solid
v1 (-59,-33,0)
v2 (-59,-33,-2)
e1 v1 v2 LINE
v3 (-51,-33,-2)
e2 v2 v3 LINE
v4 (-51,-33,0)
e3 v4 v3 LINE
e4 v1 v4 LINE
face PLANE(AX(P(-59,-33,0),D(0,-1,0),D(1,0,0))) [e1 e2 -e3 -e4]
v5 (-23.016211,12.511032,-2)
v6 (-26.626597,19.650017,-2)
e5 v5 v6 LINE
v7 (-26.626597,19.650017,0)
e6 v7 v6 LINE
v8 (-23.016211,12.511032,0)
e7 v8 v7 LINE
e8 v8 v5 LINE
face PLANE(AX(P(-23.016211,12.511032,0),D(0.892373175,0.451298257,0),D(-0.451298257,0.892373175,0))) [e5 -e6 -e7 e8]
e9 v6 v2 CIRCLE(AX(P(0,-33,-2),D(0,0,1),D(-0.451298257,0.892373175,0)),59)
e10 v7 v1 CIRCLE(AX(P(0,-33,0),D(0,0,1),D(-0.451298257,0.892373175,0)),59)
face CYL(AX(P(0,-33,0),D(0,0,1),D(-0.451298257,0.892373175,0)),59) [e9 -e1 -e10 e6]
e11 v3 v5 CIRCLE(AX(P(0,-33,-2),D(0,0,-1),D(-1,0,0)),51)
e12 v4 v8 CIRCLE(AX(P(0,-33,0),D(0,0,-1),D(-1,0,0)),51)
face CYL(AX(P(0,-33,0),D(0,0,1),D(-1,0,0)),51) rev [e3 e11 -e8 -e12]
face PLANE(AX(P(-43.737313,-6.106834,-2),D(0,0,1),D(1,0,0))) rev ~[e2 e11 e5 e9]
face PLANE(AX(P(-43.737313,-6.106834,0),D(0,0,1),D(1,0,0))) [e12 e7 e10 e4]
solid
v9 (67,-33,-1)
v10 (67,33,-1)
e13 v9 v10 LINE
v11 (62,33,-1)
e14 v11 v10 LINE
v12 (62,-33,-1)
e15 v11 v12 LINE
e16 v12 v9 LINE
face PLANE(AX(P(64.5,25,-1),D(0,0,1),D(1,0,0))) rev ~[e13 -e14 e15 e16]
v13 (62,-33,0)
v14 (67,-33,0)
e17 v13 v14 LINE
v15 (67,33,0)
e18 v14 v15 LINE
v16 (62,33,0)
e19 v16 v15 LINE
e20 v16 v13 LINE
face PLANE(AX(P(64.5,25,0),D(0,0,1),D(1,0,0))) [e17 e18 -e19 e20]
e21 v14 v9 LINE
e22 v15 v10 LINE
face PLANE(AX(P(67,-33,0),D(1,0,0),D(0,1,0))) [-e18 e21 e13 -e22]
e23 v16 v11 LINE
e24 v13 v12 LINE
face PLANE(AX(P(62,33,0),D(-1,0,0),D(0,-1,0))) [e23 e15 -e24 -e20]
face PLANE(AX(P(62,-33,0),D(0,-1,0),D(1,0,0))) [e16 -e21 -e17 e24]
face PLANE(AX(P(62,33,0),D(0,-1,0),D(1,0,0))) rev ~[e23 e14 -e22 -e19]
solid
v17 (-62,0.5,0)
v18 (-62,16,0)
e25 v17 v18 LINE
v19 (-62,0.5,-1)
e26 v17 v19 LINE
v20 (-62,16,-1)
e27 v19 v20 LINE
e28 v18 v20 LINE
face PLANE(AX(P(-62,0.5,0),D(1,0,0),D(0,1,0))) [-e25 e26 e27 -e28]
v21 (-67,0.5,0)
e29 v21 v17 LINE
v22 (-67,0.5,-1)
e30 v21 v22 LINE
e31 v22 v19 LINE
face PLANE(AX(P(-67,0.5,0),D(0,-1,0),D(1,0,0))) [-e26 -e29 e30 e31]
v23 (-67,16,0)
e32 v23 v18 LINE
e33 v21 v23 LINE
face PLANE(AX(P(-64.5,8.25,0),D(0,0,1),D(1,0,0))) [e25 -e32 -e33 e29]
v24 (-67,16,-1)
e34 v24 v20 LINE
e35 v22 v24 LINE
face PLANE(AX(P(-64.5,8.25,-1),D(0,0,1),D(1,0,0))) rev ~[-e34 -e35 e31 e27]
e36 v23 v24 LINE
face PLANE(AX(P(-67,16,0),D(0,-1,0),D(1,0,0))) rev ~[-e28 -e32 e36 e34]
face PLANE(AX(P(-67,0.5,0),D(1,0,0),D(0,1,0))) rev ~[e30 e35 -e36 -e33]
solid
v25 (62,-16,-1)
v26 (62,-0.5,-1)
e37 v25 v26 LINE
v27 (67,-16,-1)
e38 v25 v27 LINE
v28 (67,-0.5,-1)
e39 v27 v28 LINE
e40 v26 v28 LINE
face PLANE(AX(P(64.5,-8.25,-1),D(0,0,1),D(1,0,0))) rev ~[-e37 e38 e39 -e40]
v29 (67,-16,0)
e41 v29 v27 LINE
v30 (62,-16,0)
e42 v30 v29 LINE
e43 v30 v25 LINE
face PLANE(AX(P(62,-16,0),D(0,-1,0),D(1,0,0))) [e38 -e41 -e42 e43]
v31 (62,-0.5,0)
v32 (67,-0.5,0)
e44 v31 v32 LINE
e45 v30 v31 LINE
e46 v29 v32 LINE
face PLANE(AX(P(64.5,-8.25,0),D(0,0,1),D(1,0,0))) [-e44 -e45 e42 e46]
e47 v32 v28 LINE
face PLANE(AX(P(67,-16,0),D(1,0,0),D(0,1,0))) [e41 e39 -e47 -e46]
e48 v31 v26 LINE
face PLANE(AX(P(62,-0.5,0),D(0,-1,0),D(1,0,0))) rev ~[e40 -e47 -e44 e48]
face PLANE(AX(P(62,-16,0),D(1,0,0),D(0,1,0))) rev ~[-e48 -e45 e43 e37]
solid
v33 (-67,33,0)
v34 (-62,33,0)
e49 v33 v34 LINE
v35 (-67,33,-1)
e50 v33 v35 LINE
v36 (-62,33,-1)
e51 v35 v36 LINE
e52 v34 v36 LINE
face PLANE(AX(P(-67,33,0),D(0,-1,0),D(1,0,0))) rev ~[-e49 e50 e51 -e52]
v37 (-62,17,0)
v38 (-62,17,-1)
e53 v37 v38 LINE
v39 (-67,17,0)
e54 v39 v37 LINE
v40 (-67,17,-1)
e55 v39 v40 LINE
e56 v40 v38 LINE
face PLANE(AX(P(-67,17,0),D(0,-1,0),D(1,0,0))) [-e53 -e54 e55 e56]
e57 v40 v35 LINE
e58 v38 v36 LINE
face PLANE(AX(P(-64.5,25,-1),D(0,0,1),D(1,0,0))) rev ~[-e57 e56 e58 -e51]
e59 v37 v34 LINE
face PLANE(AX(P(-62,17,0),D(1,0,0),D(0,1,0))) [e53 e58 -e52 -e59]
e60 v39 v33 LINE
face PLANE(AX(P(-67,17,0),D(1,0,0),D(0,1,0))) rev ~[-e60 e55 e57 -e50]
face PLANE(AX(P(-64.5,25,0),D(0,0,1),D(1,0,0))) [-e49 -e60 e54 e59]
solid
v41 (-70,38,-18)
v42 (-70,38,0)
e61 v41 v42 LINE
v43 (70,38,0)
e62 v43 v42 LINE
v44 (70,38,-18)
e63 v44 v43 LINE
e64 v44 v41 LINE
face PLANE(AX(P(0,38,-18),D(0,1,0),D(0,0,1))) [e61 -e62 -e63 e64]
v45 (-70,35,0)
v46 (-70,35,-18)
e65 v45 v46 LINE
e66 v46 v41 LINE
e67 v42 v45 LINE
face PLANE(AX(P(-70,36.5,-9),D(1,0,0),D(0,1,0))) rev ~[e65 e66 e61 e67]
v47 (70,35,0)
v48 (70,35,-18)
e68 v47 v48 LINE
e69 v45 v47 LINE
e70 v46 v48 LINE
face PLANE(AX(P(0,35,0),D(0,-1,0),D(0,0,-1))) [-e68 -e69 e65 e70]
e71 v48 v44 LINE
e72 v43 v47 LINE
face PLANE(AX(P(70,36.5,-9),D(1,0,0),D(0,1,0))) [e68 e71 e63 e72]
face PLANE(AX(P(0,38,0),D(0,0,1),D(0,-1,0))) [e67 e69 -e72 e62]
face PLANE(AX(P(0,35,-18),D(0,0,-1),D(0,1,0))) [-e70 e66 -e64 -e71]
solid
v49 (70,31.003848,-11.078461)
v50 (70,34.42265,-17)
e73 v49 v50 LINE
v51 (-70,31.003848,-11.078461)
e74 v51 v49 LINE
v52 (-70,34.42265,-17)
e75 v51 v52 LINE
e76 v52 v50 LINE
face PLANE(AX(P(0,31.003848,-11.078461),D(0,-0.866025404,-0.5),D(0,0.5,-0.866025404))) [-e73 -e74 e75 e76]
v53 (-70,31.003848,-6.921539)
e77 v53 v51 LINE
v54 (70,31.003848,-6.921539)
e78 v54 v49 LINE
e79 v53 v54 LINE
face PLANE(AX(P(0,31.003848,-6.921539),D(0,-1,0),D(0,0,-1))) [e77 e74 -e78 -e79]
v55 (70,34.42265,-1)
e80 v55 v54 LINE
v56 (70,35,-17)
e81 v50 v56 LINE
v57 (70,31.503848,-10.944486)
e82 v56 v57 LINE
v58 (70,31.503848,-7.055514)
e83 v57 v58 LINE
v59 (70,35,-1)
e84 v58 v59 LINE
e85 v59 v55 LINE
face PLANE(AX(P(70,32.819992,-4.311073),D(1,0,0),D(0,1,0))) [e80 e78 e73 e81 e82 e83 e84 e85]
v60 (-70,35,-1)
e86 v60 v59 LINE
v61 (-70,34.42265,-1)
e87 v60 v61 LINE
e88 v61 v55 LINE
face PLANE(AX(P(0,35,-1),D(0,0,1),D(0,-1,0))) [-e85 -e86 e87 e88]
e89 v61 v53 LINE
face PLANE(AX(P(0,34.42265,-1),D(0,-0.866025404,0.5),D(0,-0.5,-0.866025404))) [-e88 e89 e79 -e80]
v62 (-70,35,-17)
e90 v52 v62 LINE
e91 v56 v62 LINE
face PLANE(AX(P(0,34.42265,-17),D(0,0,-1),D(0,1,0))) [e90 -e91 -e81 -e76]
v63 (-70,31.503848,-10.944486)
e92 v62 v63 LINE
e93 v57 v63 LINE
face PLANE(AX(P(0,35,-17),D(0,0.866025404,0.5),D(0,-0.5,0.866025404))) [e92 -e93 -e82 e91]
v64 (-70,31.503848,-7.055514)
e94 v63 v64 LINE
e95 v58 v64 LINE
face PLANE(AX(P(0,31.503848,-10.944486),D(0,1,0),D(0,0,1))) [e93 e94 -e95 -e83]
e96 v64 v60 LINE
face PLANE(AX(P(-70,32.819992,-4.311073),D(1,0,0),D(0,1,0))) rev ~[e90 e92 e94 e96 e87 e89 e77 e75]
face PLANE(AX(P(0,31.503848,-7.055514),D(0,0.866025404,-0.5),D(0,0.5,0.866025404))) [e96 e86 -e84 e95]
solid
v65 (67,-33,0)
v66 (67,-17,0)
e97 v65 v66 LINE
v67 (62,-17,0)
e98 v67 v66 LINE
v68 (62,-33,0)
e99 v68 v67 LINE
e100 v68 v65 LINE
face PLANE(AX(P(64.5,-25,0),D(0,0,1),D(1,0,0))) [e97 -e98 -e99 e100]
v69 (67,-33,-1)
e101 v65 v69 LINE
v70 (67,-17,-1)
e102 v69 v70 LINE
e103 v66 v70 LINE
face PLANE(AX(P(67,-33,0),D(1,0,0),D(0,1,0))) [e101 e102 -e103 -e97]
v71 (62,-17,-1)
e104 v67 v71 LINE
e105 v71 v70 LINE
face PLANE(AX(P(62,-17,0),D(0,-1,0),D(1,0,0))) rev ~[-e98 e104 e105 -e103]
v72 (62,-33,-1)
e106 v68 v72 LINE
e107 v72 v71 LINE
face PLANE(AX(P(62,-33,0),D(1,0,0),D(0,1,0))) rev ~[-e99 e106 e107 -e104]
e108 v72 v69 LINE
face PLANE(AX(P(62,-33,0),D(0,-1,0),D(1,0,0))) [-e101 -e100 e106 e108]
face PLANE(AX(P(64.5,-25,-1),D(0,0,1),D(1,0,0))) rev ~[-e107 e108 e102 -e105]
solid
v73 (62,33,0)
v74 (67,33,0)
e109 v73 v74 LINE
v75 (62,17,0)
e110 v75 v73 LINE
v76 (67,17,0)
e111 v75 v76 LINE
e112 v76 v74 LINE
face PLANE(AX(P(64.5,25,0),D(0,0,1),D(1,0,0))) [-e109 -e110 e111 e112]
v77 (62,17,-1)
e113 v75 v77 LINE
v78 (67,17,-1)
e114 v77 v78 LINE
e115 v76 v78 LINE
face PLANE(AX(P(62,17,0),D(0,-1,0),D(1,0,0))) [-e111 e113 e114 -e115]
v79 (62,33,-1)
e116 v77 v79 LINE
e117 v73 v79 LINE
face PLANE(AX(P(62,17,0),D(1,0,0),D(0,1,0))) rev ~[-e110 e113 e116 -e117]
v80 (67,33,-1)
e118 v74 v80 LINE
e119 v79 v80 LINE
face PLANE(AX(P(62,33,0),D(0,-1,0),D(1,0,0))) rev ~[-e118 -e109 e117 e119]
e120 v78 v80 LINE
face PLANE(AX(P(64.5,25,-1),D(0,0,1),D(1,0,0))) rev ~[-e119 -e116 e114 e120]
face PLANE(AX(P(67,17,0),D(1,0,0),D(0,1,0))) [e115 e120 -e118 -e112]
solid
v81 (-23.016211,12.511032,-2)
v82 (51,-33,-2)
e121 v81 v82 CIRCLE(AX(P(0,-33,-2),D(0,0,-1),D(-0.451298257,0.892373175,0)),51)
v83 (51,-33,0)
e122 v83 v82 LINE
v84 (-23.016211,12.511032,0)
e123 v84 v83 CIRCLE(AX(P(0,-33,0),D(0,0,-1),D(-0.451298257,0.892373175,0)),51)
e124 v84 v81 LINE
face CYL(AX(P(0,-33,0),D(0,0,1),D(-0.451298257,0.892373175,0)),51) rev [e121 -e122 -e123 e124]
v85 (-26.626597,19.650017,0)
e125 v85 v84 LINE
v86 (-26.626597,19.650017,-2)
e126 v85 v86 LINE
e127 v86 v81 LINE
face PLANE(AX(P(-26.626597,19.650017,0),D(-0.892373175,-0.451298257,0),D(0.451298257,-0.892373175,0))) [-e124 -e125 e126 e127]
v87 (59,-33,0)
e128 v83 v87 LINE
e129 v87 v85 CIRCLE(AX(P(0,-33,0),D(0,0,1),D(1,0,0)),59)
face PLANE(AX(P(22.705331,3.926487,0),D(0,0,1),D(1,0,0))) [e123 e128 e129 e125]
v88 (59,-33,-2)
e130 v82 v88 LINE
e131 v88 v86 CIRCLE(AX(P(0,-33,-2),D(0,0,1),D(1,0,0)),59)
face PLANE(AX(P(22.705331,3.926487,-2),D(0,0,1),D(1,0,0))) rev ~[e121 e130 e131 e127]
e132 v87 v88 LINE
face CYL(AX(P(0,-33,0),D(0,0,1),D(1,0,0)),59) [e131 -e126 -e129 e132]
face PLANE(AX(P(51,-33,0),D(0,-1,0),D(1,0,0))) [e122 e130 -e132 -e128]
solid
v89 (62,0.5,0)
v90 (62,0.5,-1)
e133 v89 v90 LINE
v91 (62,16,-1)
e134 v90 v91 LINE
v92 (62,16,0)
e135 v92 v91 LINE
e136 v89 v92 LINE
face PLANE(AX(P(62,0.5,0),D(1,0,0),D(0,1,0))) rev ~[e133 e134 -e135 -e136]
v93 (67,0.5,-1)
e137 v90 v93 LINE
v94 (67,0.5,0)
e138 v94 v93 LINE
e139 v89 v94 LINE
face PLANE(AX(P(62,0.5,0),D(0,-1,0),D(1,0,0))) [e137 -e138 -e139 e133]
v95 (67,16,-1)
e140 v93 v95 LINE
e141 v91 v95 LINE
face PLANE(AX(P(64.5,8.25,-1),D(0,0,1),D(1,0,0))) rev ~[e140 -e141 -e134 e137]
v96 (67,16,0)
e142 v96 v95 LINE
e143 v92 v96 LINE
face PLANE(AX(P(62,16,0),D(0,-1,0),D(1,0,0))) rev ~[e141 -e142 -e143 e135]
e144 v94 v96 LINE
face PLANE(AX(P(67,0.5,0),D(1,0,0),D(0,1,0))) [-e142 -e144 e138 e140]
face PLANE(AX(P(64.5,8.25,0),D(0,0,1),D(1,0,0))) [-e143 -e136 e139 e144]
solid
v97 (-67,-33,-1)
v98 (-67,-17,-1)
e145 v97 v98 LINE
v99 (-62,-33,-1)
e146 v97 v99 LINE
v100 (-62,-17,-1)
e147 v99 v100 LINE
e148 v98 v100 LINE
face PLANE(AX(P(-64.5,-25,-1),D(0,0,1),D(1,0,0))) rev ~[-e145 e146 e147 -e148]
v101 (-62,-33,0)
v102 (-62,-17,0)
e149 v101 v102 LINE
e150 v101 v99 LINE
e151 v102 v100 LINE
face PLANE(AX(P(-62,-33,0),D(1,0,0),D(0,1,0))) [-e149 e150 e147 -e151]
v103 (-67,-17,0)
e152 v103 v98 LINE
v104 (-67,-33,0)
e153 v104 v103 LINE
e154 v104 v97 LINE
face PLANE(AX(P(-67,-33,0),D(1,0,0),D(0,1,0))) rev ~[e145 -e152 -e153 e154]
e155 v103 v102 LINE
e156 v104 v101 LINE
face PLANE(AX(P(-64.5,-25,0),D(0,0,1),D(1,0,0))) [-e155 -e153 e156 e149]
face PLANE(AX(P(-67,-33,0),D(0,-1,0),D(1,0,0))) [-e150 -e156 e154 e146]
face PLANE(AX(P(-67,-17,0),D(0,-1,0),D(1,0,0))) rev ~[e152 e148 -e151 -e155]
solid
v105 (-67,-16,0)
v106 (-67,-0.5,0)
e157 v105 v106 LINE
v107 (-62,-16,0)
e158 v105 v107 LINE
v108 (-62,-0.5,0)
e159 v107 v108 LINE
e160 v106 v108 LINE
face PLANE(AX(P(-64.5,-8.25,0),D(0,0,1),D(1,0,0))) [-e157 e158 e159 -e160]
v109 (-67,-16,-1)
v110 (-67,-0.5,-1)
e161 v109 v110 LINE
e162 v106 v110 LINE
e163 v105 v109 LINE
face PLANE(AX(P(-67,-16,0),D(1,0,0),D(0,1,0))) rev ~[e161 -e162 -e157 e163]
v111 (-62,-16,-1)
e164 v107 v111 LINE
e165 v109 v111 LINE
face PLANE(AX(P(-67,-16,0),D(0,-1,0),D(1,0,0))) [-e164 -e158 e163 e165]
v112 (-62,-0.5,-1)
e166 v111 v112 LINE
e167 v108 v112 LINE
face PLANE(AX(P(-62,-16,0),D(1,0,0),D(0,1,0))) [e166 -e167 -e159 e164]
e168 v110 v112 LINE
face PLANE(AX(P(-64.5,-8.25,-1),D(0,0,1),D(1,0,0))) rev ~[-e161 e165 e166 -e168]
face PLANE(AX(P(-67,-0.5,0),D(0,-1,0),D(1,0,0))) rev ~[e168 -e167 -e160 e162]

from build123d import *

# Parameters (mm, degrees)
F0_W     = 5
F0_H     = 16
F1_DEPTH = 1
F0_H_2   = 15.5
F2_DEPTH = 2
F0_H_3   = 1
F3_DEPTH = 1
F4_DEPTH = 2
F6_DEPTH = 70


with BuildPart() as f1:
    # F0 (on Top) → F1 (new body)
    with BuildSketch(Plane.XY):
        with Locations((-64.5, 25)):
            Rectangle(F0_W, F0_H)
    extrude(amount=-F1_DEPTH)


with BuildPart() as f1b:
    # F0 (on Top) → F1, piece 2 (new body)
    with BuildSketch(Plane.XY):
        with Locations((-64.5, 8.25)):
            Rectangle(F0_W, F0_H_2)
    extrude(amount=-F1_DEPTH)


with BuildPart() as f1c:
    # F0 (on Top) → F1, piece 3 (new body)
    with BuildSketch(Plane.XY):
        with Locations((-64.5, -8.25)):
            Rectangle(F0_W, F0_H_2)
    extrude(amount=-F1_DEPTH)


with BuildPart() as f1d:
    # F0 (on Top) → F1, piece 4 (new body)
    with BuildSketch(Plane.XY):
        with Locations((-64.5, -25)):
            Rectangle(F0_W, F0_H)
    extrude(amount=-F1_DEPTH)


with BuildPart() as f1e:
    # F0 (on Top) → F1, piece 5 (new body)
    with BuildSketch(Plane.XY):
        with Locations((64.5, 25)):
            Rectangle(F0_W, F0_H)
    extrude(amount=-F1_DEPTH)


with BuildPart() as f1f:
    # F0 (on Top) → F1, piece 6 (new body)
    with BuildSketch(Plane.XY):
        with Locations((64.5, 8.25)):
            Rectangle(F0_W, F0_H_2)
    extrude(amount=-F1_DEPTH)


with BuildPart() as f1g:
    # F0 (on Top) → F1, piece 7 (new body)
    with BuildSketch(Plane.XY):
        with Locations((64.5, -8.25)):
            Rectangle(F0_W, F0_H_2)
    extrude(amount=-F1_DEPTH)


with BuildPart() as f1h:
    # F0 (on Top) → F1, piece 8 (new body)
    with BuildSketch(Plane.XY):
        with Locations((64.5, -25)):
            Rectangle(F0_W, F0_H)
    extrude(amount=-F1_DEPTH)


with BuildPart() as f2:
    # F0 (on Top) → F2 (new body)
    with BuildSketch(Plane.XY):
        with BuildLine():
            Line((-23.0162111194, 12.5110319121), (-26.6265971774, 19.6500173101))
            ThreePointArc((-26.6265971774, 19.6500173101), (-50.2591744534, -2.0966768249), (-59, -33))
            Line((-59, -33), (-51, -33))
            ThreePointArc((-51, -33), (-43.4443711376, -6.2869579334), (-23.0162111194, 12.5110319121))
        make_face()
    extrude(amount=-F2_DEPTH)


with BuildPart() as f3:
    # F0 (on Top) → F3 (new body)
    with BuildSketch(Plane.XY):
        with Locations((64.5, 25)):
            Rectangle(F0_W, F0_H)
        with Locations((64.5, 16.5)):
            Rectangle(F0_W, F0_H_3)
        with Locations((64.5, 8.25)):
            Rectangle(F0_W, F0_H_2)
        with Locations((64.5, 0)):
            Rectangle(F0_W, F0_H_3)
        with Locations((64.5, -8.25)):
            Rectangle(F0_W, F0_H_2)
        with Locations((64.5, -16.5)):
            Rectangle(F0_W, F0_H_3)
        with Locations((64.5, -25)):
            Rectangle(F0_W, F0_H)
    extrude(amount=-F3_DEPTH)


with BuildPart() as f4:
    # F0 (on Top) → F4 (new body)
    with BuildSketch(Plane.XY):
        with BuildLine():
            Line((51, -33), (59, -33))
            ThreePointArc((59, -33), (30.9033231751, 17.2591744534), (-26.6265971774, 19.6500173101))
            Line((-26.6265971774, 19.6500173101), (-23.0162111194, 12.5110319121))
            ThreePointArc((-23.0162111194, 12.5110319121), (26.7130420666, 10.4443711376), (51, -33))
        make_face()
    extrude(amount=-F4_DEPTH)


with BuildPart() as f6:
    # F5 (on Right) → F6 (new body, symmetric)
    with BuildSketch(Plane.YZ):
        Polygon((31.5038475773, -7.0555136271), (35, -1), (34.4226497308, -1), (31.0038475773, -6.9215390309), (31.0038475773, -7.9215390309), align=None)
        Polygon((34.4226497308, -17), (35, -17), (31.5038475773, -10.9444863729), (31.0038475773, -10.0784609691), (31.0038475773, -11.0784609691), align=None)
        Polygon((31.5038475773, -10.9444863729), (31.5038475773, -9), (31.0038475773, -9), (31.0038475773, -10.0784609691), align=None)
        Polygon((31.5038475773, -9), (31.5038475773, -7.0555136271), (31.0038475773, -7.9215390309), (31.0038475773, -9), align=None)
    extrude(amount=F6_DEPTH, both=True)


with BuildPart() as f6b:
    # F5 (on Right) → F6, piece 2 (new body, symmetric)
    with BuildSketch(Plane.YZ):
        Polygon((38, 0), (35, 0), (35, -1), (35, -9), (35, -17), (35, -18), (38, -18), align=None)
    extrude(amount=F6_DEPTH, both=True)


solid = Compound([f1.part, f1b.part, f1c.part, f1d.part, f1e.part, f1f.part, f1g.part, f1h.part, f2.part, f3.part, f4.part, f6.part, f6b.part])
